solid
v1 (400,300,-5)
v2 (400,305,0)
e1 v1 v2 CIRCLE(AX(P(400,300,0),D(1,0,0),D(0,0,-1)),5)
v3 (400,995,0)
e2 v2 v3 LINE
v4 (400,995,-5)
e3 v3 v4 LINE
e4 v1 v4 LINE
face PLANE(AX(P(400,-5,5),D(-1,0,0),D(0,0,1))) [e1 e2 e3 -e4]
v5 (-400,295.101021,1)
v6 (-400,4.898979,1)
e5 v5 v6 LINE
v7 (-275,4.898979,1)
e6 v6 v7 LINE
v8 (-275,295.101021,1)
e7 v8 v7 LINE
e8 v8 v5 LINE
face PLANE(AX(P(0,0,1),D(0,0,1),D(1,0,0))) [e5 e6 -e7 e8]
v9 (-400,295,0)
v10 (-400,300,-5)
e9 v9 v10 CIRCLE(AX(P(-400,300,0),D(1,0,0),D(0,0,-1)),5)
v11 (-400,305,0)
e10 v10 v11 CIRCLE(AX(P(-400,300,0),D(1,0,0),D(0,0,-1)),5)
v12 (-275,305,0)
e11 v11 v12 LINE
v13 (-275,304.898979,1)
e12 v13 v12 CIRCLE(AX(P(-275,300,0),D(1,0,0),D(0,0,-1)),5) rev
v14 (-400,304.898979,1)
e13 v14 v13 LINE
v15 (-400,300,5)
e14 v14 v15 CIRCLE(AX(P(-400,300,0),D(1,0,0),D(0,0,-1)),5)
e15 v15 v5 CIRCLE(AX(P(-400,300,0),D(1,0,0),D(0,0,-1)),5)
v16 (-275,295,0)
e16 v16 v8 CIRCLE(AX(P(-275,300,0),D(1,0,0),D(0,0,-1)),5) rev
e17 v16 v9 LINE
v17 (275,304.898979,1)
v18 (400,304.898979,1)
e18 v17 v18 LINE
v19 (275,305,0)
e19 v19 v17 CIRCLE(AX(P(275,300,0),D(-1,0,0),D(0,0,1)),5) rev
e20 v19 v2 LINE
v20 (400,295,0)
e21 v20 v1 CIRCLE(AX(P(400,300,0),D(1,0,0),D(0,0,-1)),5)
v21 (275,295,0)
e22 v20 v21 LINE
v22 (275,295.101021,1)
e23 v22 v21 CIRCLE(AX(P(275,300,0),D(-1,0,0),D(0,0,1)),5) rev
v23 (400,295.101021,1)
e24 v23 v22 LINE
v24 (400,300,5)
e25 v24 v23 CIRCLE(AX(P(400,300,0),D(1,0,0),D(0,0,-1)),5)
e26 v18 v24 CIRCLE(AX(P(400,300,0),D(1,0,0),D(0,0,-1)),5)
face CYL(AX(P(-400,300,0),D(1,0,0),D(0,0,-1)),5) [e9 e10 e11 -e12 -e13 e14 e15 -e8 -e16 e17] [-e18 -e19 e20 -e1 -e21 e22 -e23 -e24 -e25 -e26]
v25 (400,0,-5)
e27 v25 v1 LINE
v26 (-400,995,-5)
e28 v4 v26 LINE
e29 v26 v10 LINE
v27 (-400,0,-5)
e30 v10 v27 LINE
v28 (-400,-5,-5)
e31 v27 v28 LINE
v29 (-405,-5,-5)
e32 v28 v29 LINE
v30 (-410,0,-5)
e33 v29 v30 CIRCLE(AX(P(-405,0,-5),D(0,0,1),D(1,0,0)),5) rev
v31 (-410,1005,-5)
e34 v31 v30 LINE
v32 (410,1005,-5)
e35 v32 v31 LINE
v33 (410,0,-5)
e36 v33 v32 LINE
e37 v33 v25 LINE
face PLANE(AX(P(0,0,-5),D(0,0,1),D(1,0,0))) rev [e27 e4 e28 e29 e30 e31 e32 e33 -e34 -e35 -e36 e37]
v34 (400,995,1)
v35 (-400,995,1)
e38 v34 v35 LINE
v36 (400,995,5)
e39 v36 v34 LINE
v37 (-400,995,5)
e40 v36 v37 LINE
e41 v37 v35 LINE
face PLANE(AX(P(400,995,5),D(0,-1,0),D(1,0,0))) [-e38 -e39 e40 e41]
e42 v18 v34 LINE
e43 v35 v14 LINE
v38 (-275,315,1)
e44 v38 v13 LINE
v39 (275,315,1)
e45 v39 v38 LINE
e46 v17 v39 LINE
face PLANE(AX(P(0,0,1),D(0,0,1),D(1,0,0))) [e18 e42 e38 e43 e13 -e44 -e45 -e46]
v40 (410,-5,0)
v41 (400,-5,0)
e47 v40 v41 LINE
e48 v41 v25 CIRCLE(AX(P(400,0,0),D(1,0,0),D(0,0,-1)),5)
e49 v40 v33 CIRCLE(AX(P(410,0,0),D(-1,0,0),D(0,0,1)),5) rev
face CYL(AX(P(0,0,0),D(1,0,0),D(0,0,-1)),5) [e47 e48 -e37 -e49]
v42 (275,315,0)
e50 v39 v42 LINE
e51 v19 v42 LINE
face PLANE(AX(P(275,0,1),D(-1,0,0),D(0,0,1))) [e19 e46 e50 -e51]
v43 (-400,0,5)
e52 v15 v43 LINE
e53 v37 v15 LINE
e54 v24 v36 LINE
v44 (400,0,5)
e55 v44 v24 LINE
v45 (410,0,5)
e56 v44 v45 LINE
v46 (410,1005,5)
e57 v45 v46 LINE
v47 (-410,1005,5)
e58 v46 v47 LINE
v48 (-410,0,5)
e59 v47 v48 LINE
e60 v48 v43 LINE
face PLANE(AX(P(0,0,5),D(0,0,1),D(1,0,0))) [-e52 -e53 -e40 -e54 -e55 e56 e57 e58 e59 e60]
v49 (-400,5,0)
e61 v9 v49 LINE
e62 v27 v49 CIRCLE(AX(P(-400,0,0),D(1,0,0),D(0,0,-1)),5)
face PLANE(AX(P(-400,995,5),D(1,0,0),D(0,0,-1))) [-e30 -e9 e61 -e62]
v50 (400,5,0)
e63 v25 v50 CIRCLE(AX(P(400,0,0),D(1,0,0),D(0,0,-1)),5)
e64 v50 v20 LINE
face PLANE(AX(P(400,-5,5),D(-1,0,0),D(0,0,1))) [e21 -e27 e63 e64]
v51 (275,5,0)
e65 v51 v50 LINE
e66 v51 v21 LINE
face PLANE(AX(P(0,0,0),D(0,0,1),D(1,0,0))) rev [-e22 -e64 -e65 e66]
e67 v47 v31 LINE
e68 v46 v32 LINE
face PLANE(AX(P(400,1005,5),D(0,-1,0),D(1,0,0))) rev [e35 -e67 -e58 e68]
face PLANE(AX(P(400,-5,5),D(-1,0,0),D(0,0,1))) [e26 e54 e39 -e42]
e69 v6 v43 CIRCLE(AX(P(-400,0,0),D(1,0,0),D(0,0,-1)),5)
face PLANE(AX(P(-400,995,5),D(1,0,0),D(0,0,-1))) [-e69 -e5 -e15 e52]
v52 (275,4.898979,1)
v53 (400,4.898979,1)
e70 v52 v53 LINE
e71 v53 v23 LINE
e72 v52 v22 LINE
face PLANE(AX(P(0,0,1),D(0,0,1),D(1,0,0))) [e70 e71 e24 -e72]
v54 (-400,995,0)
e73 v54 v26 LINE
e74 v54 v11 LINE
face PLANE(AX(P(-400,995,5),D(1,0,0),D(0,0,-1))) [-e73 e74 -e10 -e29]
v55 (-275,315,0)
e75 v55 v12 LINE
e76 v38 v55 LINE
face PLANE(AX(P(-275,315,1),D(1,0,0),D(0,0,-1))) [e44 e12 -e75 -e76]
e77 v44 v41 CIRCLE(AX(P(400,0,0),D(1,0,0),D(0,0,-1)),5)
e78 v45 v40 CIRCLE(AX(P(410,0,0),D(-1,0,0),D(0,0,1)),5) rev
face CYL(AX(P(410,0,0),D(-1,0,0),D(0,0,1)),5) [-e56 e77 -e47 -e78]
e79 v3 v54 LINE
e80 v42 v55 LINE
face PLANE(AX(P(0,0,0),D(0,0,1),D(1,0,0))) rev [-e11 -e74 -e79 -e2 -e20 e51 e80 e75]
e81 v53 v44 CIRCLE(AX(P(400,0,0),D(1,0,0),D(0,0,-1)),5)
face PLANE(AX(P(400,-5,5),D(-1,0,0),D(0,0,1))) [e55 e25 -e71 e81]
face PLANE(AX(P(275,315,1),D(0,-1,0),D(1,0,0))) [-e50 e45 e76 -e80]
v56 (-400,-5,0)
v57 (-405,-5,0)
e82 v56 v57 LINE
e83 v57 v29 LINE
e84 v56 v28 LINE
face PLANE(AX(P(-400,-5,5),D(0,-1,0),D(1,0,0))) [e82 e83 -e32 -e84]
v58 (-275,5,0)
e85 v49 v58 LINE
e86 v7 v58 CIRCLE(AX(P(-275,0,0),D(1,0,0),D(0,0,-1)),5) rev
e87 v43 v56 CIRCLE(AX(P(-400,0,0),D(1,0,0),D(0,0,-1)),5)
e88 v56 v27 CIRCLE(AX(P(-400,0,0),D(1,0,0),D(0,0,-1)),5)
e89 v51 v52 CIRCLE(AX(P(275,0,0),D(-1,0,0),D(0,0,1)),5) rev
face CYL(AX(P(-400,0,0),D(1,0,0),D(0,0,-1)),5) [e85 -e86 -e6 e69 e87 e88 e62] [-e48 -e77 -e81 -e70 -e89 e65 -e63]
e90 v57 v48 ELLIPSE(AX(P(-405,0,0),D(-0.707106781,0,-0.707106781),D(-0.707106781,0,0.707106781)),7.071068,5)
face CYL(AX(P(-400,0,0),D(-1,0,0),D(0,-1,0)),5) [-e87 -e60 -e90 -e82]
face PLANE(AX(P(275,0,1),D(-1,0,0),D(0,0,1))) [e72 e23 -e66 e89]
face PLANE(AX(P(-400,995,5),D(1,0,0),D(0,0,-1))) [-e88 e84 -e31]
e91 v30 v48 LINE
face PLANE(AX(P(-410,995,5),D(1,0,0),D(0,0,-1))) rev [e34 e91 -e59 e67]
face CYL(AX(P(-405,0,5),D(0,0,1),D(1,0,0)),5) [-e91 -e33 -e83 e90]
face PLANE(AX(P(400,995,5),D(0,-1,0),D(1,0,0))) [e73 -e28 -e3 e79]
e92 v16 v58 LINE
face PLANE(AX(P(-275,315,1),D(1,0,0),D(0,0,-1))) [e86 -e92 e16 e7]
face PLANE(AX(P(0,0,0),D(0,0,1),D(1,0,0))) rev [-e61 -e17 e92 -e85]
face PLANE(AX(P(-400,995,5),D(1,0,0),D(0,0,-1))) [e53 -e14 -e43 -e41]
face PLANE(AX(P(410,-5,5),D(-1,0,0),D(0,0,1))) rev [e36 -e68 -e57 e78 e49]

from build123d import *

# Parameters (mm, degrees)
SWEEP2_PROFILE_R    = 5
SWEEP3_PROFILE_R    = 5
EXTRUDE_THIN2_DEPTH = 5
FILLET4_R           = 5
BOSS_EXTRUDE1_DEPTH = 1


with BuildPart() as part:
    # Sweep2: sweep along a path in Sketch14
    with BuildLine(Plane.XY) as sweep2_path:
        Line((-400, 0), (400, 0))
    # Sweep2 profile (on start of the path) → Sweep2 (sweep)
    with BuildSketch(Plane(origin=(-400, 0, 0), x_dir=(0, 0, 1), z_dir=(1, 0, 0))):
        Circle(SWEEP2_PROFILE_R)
    sweep(path=sweep2_path.line)



with BuildPart() as body_2:
    # Sweep3: sweep along a path in Sketch14<3>
    with BuildLine(Plane.XY) as sweep3_path:
        Line((-400, 300), (400, 300))
    # Sweep3 profile (on start of the path) → Sweep3 (sweep)
    with BuildSketch(Plane(origin=(-400, 300, 0), x_dir=(0, 0, 1), z_dir=(1, 0, 0))):
        Circle(SWEEP3_PROFILE_R)
    sweep(path=sweep3_path.line)


with BuildPart() as part_1:
    add(part.part)

    add(body_2.part)  # Extrude-Thin2 merges body 2
    # Sketch31 → Extrude-Thin2 (add, symmetric)
    with BuildSketch(Plane.XY):
        Polygon((400, -5), (400, 995), (-400, 995), (-400, -5), (-410, -5), (-410, 1005), (410, 1005), (410, -5), align=None)
    extrude(amount=EXTRUDE_THIN2_DEPTH, both=True)

    # Fillet4
    fillet4_edges = [part_1.edges().sort_by_distance(p)[0] for p in [
        (405, -5, -5),
        (405, -5, 5),
        (-410, -5, 0),
        (-405, -5, 5),
    ]]
    fillet(fillet4_edges, radius=FILLET4_R - 0.0001)  # a hair under: the kernel refuses the full size

    # Sketch32 → Boss-Extrude1 (add)
    with BuildSketch(Plane.XY):
        Polygon((275, 0), (275, 315), (-275, 315), (-275, 0), (-410, 0), (-410, 1005), (410, 1005), (410, 0), align=None)
    extrude(amount=BOSS_EXTRUDE1_DEPTH)


solid = part_1.part
